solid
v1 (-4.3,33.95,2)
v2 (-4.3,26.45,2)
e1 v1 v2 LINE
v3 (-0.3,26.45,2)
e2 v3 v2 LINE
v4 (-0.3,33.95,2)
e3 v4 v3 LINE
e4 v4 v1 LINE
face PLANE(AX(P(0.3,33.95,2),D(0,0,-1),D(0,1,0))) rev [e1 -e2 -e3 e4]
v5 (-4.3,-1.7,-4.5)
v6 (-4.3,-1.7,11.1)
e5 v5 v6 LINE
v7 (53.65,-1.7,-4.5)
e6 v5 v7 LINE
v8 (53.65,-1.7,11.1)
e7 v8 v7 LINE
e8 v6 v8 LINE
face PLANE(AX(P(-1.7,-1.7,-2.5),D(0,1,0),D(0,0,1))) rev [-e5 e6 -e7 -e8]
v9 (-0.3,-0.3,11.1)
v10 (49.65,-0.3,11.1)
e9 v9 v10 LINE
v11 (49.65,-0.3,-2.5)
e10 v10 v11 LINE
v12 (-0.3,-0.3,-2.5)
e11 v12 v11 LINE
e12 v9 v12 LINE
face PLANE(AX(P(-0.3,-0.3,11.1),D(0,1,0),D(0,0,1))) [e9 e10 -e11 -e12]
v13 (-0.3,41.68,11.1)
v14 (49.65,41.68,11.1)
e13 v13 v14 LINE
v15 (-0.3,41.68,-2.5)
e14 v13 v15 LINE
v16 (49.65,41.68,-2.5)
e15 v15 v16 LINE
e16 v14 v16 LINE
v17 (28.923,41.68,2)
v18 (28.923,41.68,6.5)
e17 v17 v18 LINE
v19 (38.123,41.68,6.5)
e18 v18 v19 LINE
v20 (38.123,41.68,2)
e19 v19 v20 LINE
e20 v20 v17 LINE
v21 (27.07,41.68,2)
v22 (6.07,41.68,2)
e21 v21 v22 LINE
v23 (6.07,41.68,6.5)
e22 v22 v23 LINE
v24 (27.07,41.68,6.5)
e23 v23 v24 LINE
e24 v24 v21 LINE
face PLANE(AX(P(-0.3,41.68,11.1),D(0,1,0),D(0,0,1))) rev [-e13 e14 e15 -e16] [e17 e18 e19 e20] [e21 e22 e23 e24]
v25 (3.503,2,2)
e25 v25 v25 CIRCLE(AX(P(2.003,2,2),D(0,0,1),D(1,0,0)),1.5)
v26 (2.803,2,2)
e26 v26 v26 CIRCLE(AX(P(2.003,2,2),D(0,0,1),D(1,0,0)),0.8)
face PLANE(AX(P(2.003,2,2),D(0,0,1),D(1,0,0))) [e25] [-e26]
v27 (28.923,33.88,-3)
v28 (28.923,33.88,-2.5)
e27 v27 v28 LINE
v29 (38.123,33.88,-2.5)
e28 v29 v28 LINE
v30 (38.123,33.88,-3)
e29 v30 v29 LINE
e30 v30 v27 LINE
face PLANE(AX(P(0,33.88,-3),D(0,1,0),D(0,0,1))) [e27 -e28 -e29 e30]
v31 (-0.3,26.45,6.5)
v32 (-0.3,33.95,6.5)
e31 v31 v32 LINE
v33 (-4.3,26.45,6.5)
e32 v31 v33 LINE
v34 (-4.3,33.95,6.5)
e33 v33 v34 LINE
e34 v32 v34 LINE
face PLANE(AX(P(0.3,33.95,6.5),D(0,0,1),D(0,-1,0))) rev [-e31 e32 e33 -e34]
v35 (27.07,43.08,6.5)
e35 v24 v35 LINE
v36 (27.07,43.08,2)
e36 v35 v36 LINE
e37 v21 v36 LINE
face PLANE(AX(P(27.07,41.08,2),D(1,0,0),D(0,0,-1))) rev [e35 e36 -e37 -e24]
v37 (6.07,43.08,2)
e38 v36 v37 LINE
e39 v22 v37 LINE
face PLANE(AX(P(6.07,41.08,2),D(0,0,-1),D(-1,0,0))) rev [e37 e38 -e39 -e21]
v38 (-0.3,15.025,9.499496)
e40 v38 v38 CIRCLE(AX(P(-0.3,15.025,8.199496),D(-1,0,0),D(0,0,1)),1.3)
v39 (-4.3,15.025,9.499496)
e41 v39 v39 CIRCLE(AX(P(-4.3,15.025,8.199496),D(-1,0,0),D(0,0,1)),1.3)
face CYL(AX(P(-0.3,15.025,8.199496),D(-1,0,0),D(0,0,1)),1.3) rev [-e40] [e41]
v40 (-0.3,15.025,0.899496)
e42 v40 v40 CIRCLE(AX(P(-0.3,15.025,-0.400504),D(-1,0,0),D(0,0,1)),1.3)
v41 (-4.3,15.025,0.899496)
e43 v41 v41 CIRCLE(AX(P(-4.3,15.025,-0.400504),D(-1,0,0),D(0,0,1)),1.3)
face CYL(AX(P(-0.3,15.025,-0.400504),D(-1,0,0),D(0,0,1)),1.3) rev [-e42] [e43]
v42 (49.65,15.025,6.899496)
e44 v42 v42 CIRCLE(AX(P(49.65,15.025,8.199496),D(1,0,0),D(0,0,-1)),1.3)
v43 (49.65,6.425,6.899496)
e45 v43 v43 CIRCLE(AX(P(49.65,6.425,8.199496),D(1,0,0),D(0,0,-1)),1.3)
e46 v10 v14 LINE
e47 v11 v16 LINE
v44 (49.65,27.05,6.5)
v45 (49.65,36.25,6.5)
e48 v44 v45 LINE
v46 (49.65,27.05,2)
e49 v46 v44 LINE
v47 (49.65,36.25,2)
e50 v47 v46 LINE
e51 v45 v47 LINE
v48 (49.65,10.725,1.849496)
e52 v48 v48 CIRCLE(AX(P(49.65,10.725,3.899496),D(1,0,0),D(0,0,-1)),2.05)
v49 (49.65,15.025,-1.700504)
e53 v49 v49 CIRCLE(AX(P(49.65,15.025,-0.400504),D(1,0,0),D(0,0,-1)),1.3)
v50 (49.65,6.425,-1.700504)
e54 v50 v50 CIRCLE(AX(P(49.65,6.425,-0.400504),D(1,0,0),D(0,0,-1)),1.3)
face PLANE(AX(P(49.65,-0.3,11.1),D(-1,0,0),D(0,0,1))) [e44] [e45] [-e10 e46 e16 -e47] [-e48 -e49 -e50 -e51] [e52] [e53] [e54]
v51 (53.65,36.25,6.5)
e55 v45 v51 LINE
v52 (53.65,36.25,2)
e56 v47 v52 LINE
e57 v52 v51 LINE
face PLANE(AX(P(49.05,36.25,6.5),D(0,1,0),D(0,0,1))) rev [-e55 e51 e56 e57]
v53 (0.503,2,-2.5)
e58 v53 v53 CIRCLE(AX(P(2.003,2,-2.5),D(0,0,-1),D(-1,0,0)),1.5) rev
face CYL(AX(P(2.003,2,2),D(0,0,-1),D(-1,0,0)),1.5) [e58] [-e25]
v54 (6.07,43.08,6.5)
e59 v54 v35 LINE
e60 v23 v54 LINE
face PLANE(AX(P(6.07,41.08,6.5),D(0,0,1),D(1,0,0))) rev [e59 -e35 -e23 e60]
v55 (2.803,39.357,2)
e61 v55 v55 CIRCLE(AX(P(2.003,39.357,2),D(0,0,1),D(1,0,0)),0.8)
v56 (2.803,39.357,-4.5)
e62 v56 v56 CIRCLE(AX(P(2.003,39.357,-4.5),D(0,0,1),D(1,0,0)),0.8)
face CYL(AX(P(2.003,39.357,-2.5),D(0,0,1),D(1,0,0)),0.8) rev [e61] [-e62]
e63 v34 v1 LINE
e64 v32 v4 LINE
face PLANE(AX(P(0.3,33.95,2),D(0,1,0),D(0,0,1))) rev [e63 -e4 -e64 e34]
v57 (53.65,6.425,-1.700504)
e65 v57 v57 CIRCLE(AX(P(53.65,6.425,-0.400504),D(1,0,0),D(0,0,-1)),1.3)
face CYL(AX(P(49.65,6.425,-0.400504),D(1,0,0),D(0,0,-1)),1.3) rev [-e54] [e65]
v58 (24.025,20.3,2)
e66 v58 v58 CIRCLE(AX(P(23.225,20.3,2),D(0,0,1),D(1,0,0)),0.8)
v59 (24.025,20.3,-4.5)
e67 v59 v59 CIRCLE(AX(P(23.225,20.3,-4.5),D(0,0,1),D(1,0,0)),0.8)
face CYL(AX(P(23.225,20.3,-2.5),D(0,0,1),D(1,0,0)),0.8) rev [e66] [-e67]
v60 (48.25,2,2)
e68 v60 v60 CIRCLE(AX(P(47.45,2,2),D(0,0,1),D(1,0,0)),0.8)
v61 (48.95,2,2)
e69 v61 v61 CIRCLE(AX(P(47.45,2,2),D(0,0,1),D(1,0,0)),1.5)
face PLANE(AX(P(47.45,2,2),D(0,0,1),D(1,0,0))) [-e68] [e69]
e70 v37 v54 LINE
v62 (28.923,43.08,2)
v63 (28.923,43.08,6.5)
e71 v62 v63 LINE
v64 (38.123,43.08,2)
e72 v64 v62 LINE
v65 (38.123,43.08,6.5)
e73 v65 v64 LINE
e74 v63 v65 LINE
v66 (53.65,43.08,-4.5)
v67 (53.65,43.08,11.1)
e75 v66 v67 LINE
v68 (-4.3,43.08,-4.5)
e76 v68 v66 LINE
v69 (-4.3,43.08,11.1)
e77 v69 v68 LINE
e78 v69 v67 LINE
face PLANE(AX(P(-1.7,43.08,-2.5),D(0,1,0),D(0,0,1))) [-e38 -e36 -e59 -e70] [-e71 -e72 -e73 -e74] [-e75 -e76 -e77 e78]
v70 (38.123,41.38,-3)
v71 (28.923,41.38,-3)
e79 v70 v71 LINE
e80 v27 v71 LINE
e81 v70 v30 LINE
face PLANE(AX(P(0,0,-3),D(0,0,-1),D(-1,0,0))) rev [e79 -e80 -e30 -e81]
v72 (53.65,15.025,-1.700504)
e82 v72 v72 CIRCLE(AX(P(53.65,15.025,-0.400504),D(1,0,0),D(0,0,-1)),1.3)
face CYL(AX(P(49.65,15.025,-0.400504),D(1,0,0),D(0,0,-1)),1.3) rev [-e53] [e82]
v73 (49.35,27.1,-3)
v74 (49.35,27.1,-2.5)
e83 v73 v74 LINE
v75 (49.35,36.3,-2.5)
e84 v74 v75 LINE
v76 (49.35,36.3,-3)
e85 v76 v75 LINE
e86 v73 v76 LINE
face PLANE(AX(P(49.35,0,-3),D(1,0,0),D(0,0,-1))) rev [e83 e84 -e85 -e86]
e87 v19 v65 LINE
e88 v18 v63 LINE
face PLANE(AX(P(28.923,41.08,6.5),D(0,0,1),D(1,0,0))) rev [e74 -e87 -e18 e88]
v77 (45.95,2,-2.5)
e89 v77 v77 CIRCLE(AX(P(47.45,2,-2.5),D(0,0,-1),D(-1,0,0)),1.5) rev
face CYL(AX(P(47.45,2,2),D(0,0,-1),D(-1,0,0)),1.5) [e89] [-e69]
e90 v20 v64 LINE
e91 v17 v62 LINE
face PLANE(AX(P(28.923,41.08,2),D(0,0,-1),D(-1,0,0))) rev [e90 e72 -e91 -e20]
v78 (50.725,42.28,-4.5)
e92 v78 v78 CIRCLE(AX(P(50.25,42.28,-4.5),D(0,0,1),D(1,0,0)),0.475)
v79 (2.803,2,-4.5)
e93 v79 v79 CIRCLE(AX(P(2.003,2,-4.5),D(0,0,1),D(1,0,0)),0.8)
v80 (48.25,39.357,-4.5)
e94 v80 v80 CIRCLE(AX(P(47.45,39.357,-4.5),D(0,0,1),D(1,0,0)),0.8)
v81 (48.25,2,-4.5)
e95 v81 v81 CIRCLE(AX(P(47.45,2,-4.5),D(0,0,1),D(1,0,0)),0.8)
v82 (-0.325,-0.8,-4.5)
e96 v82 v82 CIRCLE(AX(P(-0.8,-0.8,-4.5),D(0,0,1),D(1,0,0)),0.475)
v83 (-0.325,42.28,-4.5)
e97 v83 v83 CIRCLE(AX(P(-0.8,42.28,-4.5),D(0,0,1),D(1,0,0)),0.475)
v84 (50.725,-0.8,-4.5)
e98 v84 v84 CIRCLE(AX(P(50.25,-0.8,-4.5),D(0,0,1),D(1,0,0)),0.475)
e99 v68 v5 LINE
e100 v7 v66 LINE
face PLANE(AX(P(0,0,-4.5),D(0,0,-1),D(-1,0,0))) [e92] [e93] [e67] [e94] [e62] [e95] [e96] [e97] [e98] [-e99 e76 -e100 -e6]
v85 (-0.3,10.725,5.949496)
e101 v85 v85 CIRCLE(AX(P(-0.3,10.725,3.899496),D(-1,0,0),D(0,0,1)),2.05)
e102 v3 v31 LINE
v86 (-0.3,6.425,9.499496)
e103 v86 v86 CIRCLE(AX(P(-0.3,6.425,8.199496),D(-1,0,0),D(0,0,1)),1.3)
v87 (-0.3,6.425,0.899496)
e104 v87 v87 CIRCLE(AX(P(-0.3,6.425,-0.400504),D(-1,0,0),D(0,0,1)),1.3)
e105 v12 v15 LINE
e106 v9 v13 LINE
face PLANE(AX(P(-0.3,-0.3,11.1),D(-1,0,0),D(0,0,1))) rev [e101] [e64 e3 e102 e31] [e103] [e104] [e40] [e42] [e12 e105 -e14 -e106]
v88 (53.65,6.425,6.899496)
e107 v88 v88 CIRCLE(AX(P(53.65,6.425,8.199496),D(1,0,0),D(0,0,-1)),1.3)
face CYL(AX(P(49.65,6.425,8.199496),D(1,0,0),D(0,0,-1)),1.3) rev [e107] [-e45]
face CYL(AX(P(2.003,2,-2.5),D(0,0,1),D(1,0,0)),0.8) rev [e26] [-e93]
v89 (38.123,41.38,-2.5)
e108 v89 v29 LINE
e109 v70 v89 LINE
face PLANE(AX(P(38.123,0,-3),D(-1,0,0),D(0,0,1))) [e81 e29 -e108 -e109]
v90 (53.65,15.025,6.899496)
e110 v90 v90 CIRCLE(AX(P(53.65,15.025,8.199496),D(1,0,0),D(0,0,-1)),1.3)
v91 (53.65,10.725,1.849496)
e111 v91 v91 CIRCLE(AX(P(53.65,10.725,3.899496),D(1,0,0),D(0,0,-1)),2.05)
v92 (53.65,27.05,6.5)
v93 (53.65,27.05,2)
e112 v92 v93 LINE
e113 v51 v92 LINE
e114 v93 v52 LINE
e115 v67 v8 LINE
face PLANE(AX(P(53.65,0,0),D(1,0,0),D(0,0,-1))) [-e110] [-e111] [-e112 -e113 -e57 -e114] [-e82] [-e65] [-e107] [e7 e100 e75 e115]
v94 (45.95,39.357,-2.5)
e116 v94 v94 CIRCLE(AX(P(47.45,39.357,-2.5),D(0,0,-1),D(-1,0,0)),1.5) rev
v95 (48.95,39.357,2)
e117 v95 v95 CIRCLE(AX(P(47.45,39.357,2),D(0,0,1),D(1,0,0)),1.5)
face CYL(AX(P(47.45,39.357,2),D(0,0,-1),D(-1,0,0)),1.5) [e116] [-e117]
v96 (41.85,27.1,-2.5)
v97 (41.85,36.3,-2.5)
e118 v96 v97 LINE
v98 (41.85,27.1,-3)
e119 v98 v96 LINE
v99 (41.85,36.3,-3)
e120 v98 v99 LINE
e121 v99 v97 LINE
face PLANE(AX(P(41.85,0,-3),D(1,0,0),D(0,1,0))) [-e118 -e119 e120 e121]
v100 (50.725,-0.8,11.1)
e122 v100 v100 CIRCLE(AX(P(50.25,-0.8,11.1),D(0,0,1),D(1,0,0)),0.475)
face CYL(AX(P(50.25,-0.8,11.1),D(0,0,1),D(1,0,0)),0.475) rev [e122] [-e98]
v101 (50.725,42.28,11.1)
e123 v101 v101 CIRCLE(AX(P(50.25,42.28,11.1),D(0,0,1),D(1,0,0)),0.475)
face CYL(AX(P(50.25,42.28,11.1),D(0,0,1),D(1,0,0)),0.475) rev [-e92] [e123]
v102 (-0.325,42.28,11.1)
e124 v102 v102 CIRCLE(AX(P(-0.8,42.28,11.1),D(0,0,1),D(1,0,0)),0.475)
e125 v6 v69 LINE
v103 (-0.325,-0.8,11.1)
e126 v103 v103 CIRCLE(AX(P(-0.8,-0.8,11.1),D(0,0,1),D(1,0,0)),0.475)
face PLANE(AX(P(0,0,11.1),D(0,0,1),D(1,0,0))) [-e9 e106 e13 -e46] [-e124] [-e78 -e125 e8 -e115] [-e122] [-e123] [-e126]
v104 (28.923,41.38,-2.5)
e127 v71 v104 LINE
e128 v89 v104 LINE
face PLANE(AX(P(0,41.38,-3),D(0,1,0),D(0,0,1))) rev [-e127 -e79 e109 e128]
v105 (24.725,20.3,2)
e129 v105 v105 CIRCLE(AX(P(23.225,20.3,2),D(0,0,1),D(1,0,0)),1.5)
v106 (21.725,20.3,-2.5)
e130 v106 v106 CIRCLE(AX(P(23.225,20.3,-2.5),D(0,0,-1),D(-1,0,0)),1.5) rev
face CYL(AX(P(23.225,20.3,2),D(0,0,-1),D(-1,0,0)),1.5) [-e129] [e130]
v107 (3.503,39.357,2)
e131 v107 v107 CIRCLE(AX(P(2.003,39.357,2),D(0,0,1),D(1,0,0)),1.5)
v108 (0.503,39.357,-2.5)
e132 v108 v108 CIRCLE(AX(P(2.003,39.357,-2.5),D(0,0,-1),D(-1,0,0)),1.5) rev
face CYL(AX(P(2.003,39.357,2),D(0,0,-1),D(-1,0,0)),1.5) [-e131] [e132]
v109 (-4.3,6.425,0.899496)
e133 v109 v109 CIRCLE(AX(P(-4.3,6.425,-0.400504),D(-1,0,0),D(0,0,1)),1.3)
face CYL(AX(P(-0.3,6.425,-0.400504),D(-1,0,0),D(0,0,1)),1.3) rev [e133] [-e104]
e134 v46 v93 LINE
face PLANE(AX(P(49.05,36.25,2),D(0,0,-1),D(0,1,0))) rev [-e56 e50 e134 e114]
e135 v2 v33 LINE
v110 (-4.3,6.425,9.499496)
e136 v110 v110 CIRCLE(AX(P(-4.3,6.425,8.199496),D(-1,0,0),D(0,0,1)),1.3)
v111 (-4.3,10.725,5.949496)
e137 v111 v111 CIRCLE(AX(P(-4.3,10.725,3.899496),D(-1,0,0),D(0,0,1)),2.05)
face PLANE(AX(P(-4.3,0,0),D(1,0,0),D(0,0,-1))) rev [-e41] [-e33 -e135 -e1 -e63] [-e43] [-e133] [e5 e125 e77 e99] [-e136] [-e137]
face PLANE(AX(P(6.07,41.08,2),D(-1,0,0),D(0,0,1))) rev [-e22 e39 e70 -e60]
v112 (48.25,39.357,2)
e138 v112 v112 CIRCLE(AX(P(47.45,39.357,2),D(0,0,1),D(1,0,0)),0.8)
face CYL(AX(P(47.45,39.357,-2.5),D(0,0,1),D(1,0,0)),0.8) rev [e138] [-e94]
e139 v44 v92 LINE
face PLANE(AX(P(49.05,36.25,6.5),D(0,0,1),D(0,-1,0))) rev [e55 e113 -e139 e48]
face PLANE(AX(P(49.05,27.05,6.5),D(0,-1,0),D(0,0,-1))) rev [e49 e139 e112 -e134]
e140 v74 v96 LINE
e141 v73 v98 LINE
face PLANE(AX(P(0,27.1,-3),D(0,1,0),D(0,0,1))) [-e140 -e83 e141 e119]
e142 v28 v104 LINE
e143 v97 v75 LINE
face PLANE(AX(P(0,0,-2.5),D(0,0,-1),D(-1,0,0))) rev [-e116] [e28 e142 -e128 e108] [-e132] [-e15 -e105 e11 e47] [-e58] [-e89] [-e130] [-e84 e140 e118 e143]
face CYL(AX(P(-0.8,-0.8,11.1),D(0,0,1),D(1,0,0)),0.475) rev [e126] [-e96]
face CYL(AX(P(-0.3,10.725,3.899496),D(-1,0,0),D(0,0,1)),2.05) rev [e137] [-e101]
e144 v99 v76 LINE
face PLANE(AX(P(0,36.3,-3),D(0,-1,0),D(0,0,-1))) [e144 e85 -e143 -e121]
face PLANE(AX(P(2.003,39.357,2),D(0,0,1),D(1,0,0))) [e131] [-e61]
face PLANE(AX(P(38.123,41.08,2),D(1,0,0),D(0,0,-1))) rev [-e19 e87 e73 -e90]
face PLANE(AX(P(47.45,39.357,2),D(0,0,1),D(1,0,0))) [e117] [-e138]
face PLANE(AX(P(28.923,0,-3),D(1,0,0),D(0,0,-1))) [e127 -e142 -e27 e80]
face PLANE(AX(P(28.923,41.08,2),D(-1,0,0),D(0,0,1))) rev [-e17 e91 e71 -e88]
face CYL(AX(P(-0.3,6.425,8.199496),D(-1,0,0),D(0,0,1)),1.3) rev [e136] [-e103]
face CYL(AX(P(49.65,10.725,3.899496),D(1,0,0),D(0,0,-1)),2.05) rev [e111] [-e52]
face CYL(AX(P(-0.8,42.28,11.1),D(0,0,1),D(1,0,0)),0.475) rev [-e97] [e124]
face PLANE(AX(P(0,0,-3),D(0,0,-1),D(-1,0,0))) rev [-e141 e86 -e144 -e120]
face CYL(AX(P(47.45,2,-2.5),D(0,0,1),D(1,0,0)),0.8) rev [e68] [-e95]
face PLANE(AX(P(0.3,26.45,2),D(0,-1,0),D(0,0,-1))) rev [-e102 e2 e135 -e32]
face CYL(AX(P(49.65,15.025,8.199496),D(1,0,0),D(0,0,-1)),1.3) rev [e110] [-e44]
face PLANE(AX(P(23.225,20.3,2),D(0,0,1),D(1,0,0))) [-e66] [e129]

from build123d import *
from build123d.topology import SkipClean

# Parameters (mm, degrees)
EXTRUDE_START             = -4.5
SKETCH_3_W                = 52.75
SKETCH_3_H                = 44.78
EXTRUDE_1_DEPTH           = 2
HOLE_WIZARD_M2_1_D        = 1.6
CUT_EXTRUDE_START         = -2.5
SKETCH_3_5_W              = 9.2
SKETCH_3_5_H              = 7.5
SKETCH_3_5_W_2            = 7.5
SKETCH_3_5_H_2            = 9.2
CUT_EXTRUDE_2_DEPTH       = 0.5
SKETCH_3_6_W              = 52.75
SKETCH_3_6_H              = 44.78
SKETCH_3_6_W_2            = 49.95
SKETCH_3_6_H_2            = 41.98
EXTRUDE_3_DEPTH           = 15.6
SKETCH_10_R               = 1
CUT_EXTRUDE_5_DEPTH       = 70.004774472
SKETCH_13_W               = 4.5
SKETCH_13_H               = 9.2
CUT_EXTRUDE_6_DEPTH       = 2
SKETCH_14_W               = 9.2
SKETCH_14_H               = 4.5
SKETCH_14_W_2             = 21
CUT_EXTRUDE_7_DEPTH       = 2
SKETCH_15_W               = 4.5
SKETCH_15_H               = 7.5
CUT_EXTRUDE_8_DEPTH       = 2
M1_2X0_25_2_D             = 0.95
PCB_4_5_3_M2_1_6_START    = -2.5
SKETCH_23_R               = 1.5
SKETCH_23_R_2             = 0.8
PCB_4_5_3_M2_1_6_DEPTH    = 4.5
SKETCH_26_W               = 15.6
SKETCH_26_H               = 44.78
EXTRUDE_2_6_4_DEPTH       = 2.6
SKETCH_27_W               = 15.6
SKETCH_27_H               = 44.78
EXTRUDE_2_6_4_2_DEPTH     = 2.6
SKETCH_28_R               = 1.3
SKETCH_28_R_2             = 2.05
SKETCH_28_W               = 4.5
SKETCH_28_H               = 7.5
SMA_4X2_6_4_1_USB_DEPTH   = 4
SMA_4X2_6_4_1_USB_START   = -4
SKETCH_29_R               = 1.3
SKETCH_29_R_2             = 2.05
SKETCH_29_W               = 4.5
SKETCH_29_H               = 9.2
SMA_4X2_6_4_1_USB_2_DEPTH = 4


with BuildPart() as part:
    # 草图3 → 凸台-拉伸1 (new body)
    with BuildSketch(Plane.XY.offset(EXTRUDE_START)):
        with Locations((24.675, 20.69)):
            Rectangle(SKETCH_3_W, SKETCH_3_H)
    extrude(amount=EXTRUDE_1_DEPTH)

    # M2 螺纹孔1 (through all)
    with Locations(Plane(origin=(2.003, 2, -2.5), x_dir=(1, 0, 0), z_dir=(0, 0, 1))):
        with Locations((0, 0), (45.447, 0), (45.447, 37.357), (0, 37.357), (21.222, 18.3)):
            Hole(HOLE_WIZARD_M2_1_D / 2)

    # 草图3<5> → 切除-拉伸2 (cut)
    with BuildSketch(Plane.XY.offset(CUT_EXTRUDE_START)):
        with Locations((33.523, 37.63)):
            Rectangle(SKETCH_3_5_W, SKETCH_3_5_H)
        with Locations((45.6, 31.7)):
            Rectangle(SKETCH_3_5_W_2, SKETCH_3_5_H_2)
    extrude(amount=-CUT_EXTRUDE_2_DEPTH, mode=Mode.SUBTRACT)

    # 草图3<6> → 凸台-拉伸3 (add)
    with BuildSketch(Plane.XY.offset(EXTRUDE_START)):
        with Locations((24.675, 20.69)):
            Rectangle(SKETCH_3_6_W, SKETCH_3_6_H)
        with Locations((24.675, 20.69)):
            Rectangle(SKETCH_3_6_W_2, SKETCH_3_6_H_2, mode=Mode.SUBTRACT)
    extrude(amount=EXTRUDE_3_DEPTH)

    # 草图10 → 切除-拉伸5 (cut, through all)
    with BuildSketch(Plane.ZY.offset(1.7)):
        with Locations((3.3, 10.725)):
            Circle(SKETCH_10_R)
    extrude(amount=-CUT_EXTRUDE_5_DEPTH, mode=Mode.SUBTRACT)

    # 草图13 → 切除-拉伸6 (cut)
    with BuildSketch(Plane(origin=(51.05, 0, 0), x_dir=(0, 0, -1), z_dir=(1, 0, 0))):
        with Locations((-4.25, 31.65)):
            Rectangle(SKETCH_13_W, SKETCH_13_H)
    extrude(amount=-CUT_EXTRUDE_6_DEPTH, mode=Mode.SUBTRACT)

    # 草图14 → 切除-拉伸7 (cut)
    with BuildSketch(Plane(origin=(0, 43.08, 0), x_dir=(1, 0, 0), z_dir=(0, 1, 0))):
        with Locations((33.523, -4.25)):
            Rectangle(SKETCH_14_W, SKETCH_14_H)
        with Locations((16.57, -4.25)):
            Rectangle(SKETCH_14_W_2, SKETCH_14_H)
    extrude(amount=-CUT_EXTRUDE_7_DEPTH, mode=Mode.SUBTRACT)

    # 草图15 → 切除-拉伸8 (cut)
    with BuildSketch(Plane.ZY.offset(1.7)):
        with Locations((4.25, 30.2)):
            Rectangle(SKETCH_15_W, SKETCH_15_H)
    extrude(amount=-CUT_EXTRUDE_8_DEPTH, mode=Mode.SUBTRACT)

    # M1.2x0.25 螺纹孔2 (through all)
    with Locations(Plane(origin=(-0.8, -0.8, 11.1), x_dir=(1, 0, 0), z_dir=(0, 0, 1))):
        with Locations((0, 0), (51.05, 0), (51.05, 43.08), (0, 43.08)):
            Hole(M1_2X0_25_2_D / 2)

    # 草图23 → 保持PCB原高度的五处支撑柱_高4.5_外径3_M2底孔1.6 (add)
    # profile 1 of 5: a face of its own
    with SkipClean():  # the faces are left unmerged after this step: merging them gives an invalid solid
        with BuildSketch(Plane.XY.offset(PCB_4_5_3_M2_1_6_START)):
            with Locations(Location((23.225, 20.3, 0), (0, 0, 180))):
                Circle(SKETCH_23_R)
            with Locations((23.225, 20.3)):
                Circle(SKETCH_23_R_2, mode=Mode.SUBTRACT)
        # profile 2 of 5: a face of its own
        with BuildSketch(Plane.XY.offset(PCB_4_5_3_M2_1_6_START)):
            with Locations(Location((2.003, 39.357, 0), (0, 0, 180))):
                Circle(SKETCH_23_R)
            with Locations((2.003, 39.357)):
                Circle(SKETCH_23_R_2, mode=Mode.SUBTRACT)
        # profile 3 of 5: a face of its own
        with BuildSketch(Plane.XY.offset(PCB_4_5_3_M2_1_6_START)):
            with Locations(Location((47.45, 39.357, 0), (0, 0, 180))):
                Circle(SKETCH_23_R)
            with Locations((47.45, 39.357)):
                Circle(SKETCH_23_R_2, mode=Mode.SUBTRACT)
        # profile 4 of 5: a face of its own
        with BuildSketch(Plane.XY.offset(PCB_4_5_3_M2_1_6_START)):
            with Locations(Location((47.45, 2, 0), (0, 0, 180))):
                Circle(SKETCH_23_R)
            with Locations((47.45, 2)):
                Circle(SKETCH_23_R_2, mode=Mode.SUBTRACT)
        # profile 5 of 5: a face of its own
        with BuildSketch(Plane.XY.offset(PCB_4_5_3_M2_1_6_START)):
            with Locations(Location((2.003, 2, 0), (0, 0, 180))):
                Circle(SKETCH_23_R)
            with Locations((2.003, 2)):
                Circle(SKETCH_23_R_2, mode=Mode.SUBTRACT)
        extrude(amount=PCB_4_5_3_M2_1_6_DEPTH)
    add(part.part.scale(1), mode=Mode.REPLACE)  # the faces are merged on a copy

    # 草图26 → Extrude 2.6__4 (add)
    with BuildSketch(Plane.ZY.offset(1.7)):
        with Locations((3.3, 20.69)):
            Rectangle(SKETCH_26_W, SKETCH_26_H)
    extrude(amount=EXTRUDE_2_6_4_DEPTH)

    # 草图27 → Extrude 2.6__4 2 (add)
    with BuildSketch(Plane(origin=(51.05, 0, 0), x_dir=(0, 0, -1), z_dir=(1, 0, 0))):
        with Locations((-3.3, 20.69)):
            Rectangle(SKETCH_27_W, SKETCH_27_H)
    extrude(amount=EXTRUDE_2_6_4_2_DEPTH)

    # 草图28 → SMA__4x2.6__4.1__USB (cut)
    with BuildSketch(Plane.ZY.offset(4.3)):
        with Locations((-0.400503673, 6.425)):
            Circle(SKETCH_28_R)
        with Locations((8.199496327, 6.425)):
            Circle(SKETCH_28_R)
        with Locations((-0.400503673, 15.025)):
            Circle(SKETCH_28_R)
        with Locations((8.199496327, 15.025)):
            Circle(SKETCH_28_R)
        with Locations((3.899496327, 10.725)):
            Circle(SKETCH_28_R_2)
        with Locations((4.25, 30.2)):
            Rectangle(SKETCH_28_W, SKETCH_28_H)
    extrude(amount=-SMA_4X2_6_4_1_USB_DEPTH, mode=Mode.SUBTRACT)

    # 草图29 → SMA__4x2.6__4.1__USB 2 (cut)
    with SkipClean():  # the faces are left unmerged after this step: merging them gives an invalid solid
        with BuildSketch(Plane(origin=(53.65, 0, 0), x_dir=(0, 0, -1), z_dir=(1, 0, 0)).offset(SMA_4X2_6_4_1_USB_START)):
            with Locations(Location((0.400503673, 6.425, 0), (0, 0, 180))):
                Circle(SKETCH_29_R)
            with Locations(Location((-8.199496327, 6.425, 0), (0, 0, 180))):
                Circle(SKETCH_29_R)
            with Locations(Location((0.400503673, 15.025, 0), (0, 0, 180))):
                Circle(SKETCH_29_R)
            with Locations(Location((-8.199496327, 15.025, 0), (0, 0, 180))):
                Circle(SKETCH_29_R)
            with Locations(Location((-3.899496327, 10.725, 0), (0, 0, 180))):
                Circle(SKETCH_29_R_2)
            with Locations((-4.25, 31.65)):
                Rectangle(SKETCH_29_W, SKETCH_29_H)
        extrude(amount=SMA_4X2_6_4_1_USB_2_DEPTH, mode=Mode.SUBTRACT)


solid = part.part
